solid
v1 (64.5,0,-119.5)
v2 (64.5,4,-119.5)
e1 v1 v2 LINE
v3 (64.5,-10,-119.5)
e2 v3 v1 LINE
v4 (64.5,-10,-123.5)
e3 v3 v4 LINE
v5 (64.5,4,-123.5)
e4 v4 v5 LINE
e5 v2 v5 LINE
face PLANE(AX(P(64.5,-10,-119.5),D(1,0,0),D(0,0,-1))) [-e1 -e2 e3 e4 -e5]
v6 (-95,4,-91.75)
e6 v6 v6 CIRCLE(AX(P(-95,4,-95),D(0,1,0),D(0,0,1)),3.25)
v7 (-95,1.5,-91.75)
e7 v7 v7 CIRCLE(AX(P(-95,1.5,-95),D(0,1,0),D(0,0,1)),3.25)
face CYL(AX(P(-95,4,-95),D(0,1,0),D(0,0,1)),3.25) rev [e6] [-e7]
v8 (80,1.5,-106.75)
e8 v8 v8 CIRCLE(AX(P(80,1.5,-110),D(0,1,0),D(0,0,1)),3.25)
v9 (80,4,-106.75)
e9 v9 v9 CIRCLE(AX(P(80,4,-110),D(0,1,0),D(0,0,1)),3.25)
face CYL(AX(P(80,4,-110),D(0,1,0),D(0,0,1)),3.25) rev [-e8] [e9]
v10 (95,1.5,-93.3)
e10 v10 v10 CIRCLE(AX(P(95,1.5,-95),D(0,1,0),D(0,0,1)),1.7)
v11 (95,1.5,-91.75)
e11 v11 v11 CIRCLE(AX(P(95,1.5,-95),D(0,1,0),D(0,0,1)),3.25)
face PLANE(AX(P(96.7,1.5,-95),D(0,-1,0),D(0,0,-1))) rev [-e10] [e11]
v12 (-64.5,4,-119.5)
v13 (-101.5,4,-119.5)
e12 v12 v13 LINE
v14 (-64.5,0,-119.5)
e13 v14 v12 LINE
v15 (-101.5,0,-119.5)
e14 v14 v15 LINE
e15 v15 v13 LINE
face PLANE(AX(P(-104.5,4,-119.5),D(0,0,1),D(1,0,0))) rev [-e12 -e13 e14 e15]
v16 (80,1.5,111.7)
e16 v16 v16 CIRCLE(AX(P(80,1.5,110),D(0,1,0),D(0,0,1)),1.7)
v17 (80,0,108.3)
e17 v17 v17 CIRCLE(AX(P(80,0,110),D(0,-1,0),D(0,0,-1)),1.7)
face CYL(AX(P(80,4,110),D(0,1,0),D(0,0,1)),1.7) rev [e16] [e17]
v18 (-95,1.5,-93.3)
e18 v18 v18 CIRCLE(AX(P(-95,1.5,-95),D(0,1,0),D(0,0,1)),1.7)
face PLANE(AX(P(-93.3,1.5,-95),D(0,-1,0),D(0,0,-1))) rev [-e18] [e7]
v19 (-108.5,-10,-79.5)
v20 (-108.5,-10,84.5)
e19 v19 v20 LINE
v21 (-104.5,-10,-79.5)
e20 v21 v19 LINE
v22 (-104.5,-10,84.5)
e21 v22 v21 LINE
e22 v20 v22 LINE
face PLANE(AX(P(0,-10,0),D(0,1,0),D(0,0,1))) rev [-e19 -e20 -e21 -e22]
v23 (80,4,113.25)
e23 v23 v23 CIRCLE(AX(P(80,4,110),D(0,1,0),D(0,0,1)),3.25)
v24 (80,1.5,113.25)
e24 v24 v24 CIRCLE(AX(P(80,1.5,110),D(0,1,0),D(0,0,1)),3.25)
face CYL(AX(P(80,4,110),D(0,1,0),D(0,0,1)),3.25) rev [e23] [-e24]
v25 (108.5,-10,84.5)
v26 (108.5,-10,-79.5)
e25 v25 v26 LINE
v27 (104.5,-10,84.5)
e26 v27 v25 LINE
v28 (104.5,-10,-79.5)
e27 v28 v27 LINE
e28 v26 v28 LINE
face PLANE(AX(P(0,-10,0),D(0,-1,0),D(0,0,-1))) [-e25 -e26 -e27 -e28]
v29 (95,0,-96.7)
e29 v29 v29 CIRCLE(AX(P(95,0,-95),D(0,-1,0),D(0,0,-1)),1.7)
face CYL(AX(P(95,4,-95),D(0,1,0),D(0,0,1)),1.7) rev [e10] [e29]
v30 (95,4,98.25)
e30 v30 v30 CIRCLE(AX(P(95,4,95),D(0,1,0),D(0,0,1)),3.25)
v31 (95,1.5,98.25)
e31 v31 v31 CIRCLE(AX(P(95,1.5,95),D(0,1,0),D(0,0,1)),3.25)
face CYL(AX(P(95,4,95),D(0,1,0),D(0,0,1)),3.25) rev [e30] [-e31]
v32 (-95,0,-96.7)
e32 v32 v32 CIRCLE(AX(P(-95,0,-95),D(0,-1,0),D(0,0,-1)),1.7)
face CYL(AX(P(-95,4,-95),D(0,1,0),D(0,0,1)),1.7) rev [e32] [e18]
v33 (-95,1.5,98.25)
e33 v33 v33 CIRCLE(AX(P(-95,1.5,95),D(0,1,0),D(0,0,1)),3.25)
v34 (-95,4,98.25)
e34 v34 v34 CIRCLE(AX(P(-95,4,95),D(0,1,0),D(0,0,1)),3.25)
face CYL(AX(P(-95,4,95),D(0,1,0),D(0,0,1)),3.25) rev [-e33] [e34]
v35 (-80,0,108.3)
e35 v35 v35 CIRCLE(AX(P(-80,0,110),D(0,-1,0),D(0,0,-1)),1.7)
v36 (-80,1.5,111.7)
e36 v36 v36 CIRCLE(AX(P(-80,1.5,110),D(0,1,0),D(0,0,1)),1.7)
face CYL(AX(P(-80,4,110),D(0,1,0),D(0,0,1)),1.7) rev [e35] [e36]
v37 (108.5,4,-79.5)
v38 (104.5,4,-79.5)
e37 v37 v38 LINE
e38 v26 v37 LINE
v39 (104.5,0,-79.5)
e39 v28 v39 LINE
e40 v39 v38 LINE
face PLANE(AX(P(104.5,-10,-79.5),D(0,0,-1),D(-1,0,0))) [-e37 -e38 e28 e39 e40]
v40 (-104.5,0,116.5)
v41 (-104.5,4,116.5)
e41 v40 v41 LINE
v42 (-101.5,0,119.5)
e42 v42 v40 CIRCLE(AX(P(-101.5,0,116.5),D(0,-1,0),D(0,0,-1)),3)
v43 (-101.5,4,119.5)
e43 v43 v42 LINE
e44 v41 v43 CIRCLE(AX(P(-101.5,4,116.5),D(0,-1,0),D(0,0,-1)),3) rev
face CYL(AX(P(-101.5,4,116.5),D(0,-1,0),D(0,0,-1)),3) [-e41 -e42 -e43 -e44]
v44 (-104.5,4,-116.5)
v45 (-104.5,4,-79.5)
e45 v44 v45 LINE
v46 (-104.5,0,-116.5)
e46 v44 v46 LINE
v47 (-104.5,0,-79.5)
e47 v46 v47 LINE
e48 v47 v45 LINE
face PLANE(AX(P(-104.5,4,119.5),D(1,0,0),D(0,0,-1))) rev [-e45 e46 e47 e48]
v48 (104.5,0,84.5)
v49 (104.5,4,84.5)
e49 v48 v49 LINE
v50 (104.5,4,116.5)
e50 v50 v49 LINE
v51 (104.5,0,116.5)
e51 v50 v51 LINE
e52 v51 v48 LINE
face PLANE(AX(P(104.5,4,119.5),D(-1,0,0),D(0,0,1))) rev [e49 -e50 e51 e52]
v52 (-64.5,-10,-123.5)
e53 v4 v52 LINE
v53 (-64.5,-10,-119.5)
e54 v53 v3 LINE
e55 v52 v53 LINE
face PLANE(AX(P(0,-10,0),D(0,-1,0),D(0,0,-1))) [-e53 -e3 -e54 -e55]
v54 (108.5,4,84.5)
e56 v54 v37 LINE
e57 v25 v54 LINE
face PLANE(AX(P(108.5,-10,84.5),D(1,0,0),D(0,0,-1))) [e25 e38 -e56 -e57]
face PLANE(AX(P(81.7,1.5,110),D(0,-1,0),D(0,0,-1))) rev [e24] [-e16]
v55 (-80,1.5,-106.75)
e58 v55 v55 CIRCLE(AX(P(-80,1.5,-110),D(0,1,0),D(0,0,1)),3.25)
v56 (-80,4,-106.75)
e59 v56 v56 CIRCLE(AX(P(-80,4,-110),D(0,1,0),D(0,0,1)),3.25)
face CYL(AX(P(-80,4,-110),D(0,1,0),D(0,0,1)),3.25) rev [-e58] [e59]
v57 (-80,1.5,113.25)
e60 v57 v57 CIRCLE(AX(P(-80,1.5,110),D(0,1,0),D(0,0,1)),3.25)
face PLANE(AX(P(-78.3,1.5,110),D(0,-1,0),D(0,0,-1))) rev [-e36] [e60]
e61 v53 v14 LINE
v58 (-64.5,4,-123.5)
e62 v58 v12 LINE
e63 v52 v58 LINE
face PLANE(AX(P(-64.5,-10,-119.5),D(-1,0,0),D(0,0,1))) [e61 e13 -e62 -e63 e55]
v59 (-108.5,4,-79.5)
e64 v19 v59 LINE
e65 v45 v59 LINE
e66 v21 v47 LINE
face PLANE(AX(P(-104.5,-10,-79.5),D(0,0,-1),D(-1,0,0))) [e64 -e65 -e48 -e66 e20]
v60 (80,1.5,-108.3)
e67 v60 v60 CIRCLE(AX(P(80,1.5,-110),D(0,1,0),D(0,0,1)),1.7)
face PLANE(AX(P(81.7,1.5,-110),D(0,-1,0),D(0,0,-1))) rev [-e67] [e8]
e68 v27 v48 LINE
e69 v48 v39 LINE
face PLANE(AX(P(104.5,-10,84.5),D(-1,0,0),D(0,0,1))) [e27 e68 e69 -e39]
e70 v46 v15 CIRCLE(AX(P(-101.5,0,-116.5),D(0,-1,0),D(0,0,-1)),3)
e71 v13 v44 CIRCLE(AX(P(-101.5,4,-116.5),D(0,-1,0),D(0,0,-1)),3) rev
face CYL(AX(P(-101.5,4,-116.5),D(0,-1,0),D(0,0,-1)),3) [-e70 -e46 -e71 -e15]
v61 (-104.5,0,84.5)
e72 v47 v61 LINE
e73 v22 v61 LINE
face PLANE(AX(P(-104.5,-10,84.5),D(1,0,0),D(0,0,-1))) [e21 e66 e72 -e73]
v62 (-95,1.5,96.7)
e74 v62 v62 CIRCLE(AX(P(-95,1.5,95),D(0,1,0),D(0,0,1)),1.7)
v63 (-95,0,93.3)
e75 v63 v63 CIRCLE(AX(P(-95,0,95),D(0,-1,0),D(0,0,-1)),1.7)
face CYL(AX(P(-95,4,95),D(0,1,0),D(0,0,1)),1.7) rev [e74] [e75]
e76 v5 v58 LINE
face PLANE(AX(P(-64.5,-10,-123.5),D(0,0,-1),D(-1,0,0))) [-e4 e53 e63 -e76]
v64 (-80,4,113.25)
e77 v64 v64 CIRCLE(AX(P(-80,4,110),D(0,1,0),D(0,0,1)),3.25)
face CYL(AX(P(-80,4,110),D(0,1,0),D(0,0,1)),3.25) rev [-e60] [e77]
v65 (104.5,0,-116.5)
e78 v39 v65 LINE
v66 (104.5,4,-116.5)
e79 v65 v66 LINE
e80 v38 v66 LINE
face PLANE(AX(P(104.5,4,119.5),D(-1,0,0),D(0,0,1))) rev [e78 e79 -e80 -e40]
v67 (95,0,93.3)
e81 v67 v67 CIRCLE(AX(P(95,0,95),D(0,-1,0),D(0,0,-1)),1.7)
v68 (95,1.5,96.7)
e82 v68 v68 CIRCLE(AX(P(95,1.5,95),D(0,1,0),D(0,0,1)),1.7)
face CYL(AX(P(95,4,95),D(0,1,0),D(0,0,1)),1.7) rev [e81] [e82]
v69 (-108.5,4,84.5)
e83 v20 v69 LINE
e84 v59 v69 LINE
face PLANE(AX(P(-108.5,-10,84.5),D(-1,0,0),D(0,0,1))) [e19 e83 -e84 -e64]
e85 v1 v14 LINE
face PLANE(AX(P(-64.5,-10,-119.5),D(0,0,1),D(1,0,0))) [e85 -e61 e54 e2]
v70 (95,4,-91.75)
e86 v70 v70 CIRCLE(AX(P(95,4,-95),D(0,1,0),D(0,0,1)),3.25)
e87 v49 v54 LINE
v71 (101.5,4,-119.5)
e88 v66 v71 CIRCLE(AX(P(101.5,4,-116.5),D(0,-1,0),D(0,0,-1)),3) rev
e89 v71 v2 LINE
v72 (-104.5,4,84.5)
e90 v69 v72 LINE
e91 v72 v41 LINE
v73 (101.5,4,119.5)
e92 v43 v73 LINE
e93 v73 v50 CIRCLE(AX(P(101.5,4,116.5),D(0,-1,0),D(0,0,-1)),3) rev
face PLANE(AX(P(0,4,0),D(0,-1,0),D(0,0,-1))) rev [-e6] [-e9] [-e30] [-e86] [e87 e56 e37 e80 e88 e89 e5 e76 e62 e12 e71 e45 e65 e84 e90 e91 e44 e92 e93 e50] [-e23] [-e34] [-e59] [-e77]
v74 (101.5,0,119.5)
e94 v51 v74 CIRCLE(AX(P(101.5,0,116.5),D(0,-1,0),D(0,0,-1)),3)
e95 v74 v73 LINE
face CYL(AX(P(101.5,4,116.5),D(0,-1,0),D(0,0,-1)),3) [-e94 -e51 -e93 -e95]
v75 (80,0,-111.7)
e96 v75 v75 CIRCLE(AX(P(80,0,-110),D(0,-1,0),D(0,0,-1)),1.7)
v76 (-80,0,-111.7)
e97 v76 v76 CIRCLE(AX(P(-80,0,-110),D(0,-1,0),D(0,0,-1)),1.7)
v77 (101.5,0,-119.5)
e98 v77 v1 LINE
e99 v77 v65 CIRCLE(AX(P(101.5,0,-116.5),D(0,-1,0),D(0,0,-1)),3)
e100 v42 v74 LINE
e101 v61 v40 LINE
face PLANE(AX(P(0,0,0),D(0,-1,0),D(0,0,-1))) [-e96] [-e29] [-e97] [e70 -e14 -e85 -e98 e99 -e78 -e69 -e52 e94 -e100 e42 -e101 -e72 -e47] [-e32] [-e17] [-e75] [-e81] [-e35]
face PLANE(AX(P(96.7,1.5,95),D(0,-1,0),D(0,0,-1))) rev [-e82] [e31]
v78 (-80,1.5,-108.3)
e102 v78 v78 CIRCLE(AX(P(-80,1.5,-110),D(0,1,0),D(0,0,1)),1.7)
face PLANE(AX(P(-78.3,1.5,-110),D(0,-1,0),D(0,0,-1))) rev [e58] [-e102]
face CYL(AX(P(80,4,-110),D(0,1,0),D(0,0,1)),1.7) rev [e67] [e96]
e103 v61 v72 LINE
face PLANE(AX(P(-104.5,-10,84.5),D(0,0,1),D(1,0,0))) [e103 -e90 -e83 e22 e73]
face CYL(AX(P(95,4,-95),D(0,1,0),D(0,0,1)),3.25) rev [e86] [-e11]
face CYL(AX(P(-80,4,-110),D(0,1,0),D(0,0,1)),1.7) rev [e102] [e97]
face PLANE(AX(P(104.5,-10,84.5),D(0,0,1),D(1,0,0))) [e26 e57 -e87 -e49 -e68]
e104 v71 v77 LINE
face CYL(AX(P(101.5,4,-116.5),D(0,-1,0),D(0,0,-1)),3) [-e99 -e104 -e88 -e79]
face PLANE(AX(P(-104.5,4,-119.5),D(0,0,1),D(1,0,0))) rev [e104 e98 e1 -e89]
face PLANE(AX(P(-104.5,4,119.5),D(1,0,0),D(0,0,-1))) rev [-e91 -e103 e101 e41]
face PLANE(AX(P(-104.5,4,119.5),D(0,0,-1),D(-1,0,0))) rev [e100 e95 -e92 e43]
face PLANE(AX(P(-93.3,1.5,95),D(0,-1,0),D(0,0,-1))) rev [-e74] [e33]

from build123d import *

# Parameters (mm, degrees)
SKETCH1_W                              = 209
SKETCH1_H                              = 239
BASE_PLATE_DEPTH                       = 4
MOUNTING_HOLES_START                   = 1.5
MOUNTING_HOLES_OUTLINE_R               = 3.25
MOUNTING_HOLES_DEPTH                   = 2.5
MOUNTING_HOLES_2_OUTLINE_R             = 1.7
MOUNTING_HOLES_2_DEPTH                 = 1.5
MOUNTING_HOLES_MIRROR2_START           = 1.5
MOUNTING_HOLES_MIRROR2_COPY_1_SKETCH_R = 3.25
MOUNTING_HOLES_MIRROR2_COPY_1_DEPTH    = 2.5
MOUNTING_HOLES_MIRROR2_COPY_2_SKETCH_R = 1.7
MOUNTING_HOLES_MIRROR2_COPY_2_DEPTH    = 1.5
MOUNTING_HOLES_MIRROR2_COPY_3_SKETCH_R = 1.7
MOUNTING_HOLES_MIRROR2_COPY_3_DEPTH    = 1.5
SKETCH5_W                              = 129
SKETCH5_H                              = 4
SIDE_EXTRUSION_DEPTH                   = 14
SKETCH6_W                              = 4
SKETCH6_H                              = 164
UPPER_LOWER_EXTRUSION_DEPTH            = 14
EDGE_FILLETS_R                         = 3


# Read off the part's stored shape, not the designer's step: mounting_holes
with BuildPart() as part:
    # Sketch1 → base_plate (new body)
    with BuildSketch(Plane(origin=(0, 0, 0), x_dir=(1, 0, 0), z_dir=(0, 1, 0))):
        Rectangle(SKETCH1_W, SKETCH1_H)
    extrude(amount=BASE_PLATE_DEPTH)

    # mounting_holes outline → mounting_holes (cut)
    with BuildSketch(Plane(origin=(0, 0, 0), x_dir=(1, 0, 0), z_dir=(0, 1, 0)).offset(MOUNTING_HOLES_START)):
        with Locations((95, 95)):
            Circle(MOUNTING_HOLES_OUTLINE_R)
        with Locations((80, 110)):
            Circle(MOUNTING_HOLES_OUTLINE_R)
    mounting_holes = extrude(amount=MOUNTING_HOLES_DEPTH, mode=Mode.SUBTRACT)

    # mounting_holes 2 outline → mounting_holes 2 (cut)
    with BuildSketch(Plane(origin=(0, 0, 0), x_dir=(1, 0, 0), z_dir=(0, 1, 0))):
        with Locations((95, 95)):
            Circle(MOUNTING_HOLES_2_OUTLINE_R)
        with Locations((80, 110)):
            Circle(MOUNTING_HOLES_2_OUTLINE_R)
    mounting_holes_2 = extrude(amount=MOUNTING_HOLES_2_DEPTH, mode=Mode.SUBTRACT)

    # mounting_holes_mirror1: mounting_holes, mounting_holes 2 across plane
    add(mounting_holes.mirror(Plane.XY), mode=Mode.SUBTRACT)
    add(mounting_holes_2.mirror(Plane.XY), mode=Mode.SUBTRACT)

    # mounting_holes_mirror2: mounting_holes, mounting_holes 2 across plane
    add(mounting_holes.mirror(Plane(origin=(0, 0, 0), x_dir=(0, 0, 1), z_dir=(1, 0, 0))), mode=Mode.SUBTRACT)
    add(mounting_holes_2.mirror(Plane(origin=(0, 0, 0), x_dir=(0, 0, 1), z_dir=(1, 0, 0))), mode=Mode.SUBTRACT)

    # mounting_holes_mirror2 copy 1 sketch → mounting_holes_mirror2 copy 1 (cut)
    with BuildSketch(Plane(origin=(0, 0, 0), x_dir=(-1, 0, 0), z_dir=(0, 1, 0)).offset(MOUNTING_HOLES_MIRROR2_START)):
        with Locations((95, 95)):
            Circle(MOUNTING_HOLES_MIRROR2_COPY_1_SKETCH_R)
        with Locations((80, 110)):
            Circle(MOUNTING_HOLES_MIRROR2_COPY_1_SKETCH_R)
    extrude(amount=MOUNTING_HOLES_MIRROR2_COPY_1_DEPTH, mode=Mode.SUBTRACT)

    # mounting_holes_mirror2 copy 2 sketch → mounting_holes_mirror2 copy 2 (cut)
    with BuildSketch(Plane(origin=(0, 0, 0), x_dir=(-1, 0, 0), z_dir=(0, 1, 0))):
        with Locations((95, 95)):
            Circle(MOUNTING_HOLES_MIRROR2_COPY_2_SKETCH_R)
        with Locations((80, 110)):
            Circle(MOUNTING_HOLES_MIRROR2_COPY_2_SKETCH_R)
    extrude(amount=MOUNTING_HOLES_MIRROR2_COPY_2_DEPTH, mode=Mode.SUBTRACT)

    # mounting_holes_mirror2 copy 3 sketch → mounting_holes_mirror2 copy 3 (cut)
    with BuildSketch(Plane(origin=(0, 0, 0), x_dir=(-1, 0, 0), z_dir=(0, 1, 0))):
        with Locations((95, -95)):
            Circle(MOUNTING_HOLES_MIRROR2_COPY_3_SKETCH_R)
        with Locations((80, -110)):
            Circle(MOUNTING_HOLES_MIRROR2_COPY_3_SKETCH_R)
    extrude(amount=MOUNTING_HOLES_MIRROR2_COPY_3_DEPTH, mode=Mode.SUBTRACT)

    # Sketch5 → side_extrusion (add)
    with BuildSketch(Plane(origin=(0, 4, 0), x_dir=(1, 0, 0), z_dir=(0, 1, 0))):
        with Locations((0, 121.5)):
            Rectangle(SKETCH5_W, SKETCH5_H)
    extrude(amount=-SIDE_EXTRUSION_DEPTH)

    # Sketch6 → upper_lower_extrusion (add)
    with BuildSketch(Plane(origin=(0, 4, 0), x_dir=(1, 0, 0), z_dir=(0, 1, 0))):
        with Locations((-106.5, -2.5)):
            Rectangle(SKETCH6_W, SKETCH6_H)
        with Locations((106.5, -2.5)):
            Rectangle(SKETCH6_W, SKETCH6_H)
    extrude(amount=-UPPER_LOWER_EXTRUSION_DEPTH)

    # edge_fillets
    edge_fillets_edges = [part.edges().sort_by_distance(p)[0] for p in [
        (104.5, 2, 119.5),
        (-104.5, 2, 119.5),
        (-104.5, 2, -119.5),
        (104.5, 2, -119.5),
    ]]
    fillet(edge_fillets_edges, radius=EDGE_FILLETS_R)


solid = part.part
